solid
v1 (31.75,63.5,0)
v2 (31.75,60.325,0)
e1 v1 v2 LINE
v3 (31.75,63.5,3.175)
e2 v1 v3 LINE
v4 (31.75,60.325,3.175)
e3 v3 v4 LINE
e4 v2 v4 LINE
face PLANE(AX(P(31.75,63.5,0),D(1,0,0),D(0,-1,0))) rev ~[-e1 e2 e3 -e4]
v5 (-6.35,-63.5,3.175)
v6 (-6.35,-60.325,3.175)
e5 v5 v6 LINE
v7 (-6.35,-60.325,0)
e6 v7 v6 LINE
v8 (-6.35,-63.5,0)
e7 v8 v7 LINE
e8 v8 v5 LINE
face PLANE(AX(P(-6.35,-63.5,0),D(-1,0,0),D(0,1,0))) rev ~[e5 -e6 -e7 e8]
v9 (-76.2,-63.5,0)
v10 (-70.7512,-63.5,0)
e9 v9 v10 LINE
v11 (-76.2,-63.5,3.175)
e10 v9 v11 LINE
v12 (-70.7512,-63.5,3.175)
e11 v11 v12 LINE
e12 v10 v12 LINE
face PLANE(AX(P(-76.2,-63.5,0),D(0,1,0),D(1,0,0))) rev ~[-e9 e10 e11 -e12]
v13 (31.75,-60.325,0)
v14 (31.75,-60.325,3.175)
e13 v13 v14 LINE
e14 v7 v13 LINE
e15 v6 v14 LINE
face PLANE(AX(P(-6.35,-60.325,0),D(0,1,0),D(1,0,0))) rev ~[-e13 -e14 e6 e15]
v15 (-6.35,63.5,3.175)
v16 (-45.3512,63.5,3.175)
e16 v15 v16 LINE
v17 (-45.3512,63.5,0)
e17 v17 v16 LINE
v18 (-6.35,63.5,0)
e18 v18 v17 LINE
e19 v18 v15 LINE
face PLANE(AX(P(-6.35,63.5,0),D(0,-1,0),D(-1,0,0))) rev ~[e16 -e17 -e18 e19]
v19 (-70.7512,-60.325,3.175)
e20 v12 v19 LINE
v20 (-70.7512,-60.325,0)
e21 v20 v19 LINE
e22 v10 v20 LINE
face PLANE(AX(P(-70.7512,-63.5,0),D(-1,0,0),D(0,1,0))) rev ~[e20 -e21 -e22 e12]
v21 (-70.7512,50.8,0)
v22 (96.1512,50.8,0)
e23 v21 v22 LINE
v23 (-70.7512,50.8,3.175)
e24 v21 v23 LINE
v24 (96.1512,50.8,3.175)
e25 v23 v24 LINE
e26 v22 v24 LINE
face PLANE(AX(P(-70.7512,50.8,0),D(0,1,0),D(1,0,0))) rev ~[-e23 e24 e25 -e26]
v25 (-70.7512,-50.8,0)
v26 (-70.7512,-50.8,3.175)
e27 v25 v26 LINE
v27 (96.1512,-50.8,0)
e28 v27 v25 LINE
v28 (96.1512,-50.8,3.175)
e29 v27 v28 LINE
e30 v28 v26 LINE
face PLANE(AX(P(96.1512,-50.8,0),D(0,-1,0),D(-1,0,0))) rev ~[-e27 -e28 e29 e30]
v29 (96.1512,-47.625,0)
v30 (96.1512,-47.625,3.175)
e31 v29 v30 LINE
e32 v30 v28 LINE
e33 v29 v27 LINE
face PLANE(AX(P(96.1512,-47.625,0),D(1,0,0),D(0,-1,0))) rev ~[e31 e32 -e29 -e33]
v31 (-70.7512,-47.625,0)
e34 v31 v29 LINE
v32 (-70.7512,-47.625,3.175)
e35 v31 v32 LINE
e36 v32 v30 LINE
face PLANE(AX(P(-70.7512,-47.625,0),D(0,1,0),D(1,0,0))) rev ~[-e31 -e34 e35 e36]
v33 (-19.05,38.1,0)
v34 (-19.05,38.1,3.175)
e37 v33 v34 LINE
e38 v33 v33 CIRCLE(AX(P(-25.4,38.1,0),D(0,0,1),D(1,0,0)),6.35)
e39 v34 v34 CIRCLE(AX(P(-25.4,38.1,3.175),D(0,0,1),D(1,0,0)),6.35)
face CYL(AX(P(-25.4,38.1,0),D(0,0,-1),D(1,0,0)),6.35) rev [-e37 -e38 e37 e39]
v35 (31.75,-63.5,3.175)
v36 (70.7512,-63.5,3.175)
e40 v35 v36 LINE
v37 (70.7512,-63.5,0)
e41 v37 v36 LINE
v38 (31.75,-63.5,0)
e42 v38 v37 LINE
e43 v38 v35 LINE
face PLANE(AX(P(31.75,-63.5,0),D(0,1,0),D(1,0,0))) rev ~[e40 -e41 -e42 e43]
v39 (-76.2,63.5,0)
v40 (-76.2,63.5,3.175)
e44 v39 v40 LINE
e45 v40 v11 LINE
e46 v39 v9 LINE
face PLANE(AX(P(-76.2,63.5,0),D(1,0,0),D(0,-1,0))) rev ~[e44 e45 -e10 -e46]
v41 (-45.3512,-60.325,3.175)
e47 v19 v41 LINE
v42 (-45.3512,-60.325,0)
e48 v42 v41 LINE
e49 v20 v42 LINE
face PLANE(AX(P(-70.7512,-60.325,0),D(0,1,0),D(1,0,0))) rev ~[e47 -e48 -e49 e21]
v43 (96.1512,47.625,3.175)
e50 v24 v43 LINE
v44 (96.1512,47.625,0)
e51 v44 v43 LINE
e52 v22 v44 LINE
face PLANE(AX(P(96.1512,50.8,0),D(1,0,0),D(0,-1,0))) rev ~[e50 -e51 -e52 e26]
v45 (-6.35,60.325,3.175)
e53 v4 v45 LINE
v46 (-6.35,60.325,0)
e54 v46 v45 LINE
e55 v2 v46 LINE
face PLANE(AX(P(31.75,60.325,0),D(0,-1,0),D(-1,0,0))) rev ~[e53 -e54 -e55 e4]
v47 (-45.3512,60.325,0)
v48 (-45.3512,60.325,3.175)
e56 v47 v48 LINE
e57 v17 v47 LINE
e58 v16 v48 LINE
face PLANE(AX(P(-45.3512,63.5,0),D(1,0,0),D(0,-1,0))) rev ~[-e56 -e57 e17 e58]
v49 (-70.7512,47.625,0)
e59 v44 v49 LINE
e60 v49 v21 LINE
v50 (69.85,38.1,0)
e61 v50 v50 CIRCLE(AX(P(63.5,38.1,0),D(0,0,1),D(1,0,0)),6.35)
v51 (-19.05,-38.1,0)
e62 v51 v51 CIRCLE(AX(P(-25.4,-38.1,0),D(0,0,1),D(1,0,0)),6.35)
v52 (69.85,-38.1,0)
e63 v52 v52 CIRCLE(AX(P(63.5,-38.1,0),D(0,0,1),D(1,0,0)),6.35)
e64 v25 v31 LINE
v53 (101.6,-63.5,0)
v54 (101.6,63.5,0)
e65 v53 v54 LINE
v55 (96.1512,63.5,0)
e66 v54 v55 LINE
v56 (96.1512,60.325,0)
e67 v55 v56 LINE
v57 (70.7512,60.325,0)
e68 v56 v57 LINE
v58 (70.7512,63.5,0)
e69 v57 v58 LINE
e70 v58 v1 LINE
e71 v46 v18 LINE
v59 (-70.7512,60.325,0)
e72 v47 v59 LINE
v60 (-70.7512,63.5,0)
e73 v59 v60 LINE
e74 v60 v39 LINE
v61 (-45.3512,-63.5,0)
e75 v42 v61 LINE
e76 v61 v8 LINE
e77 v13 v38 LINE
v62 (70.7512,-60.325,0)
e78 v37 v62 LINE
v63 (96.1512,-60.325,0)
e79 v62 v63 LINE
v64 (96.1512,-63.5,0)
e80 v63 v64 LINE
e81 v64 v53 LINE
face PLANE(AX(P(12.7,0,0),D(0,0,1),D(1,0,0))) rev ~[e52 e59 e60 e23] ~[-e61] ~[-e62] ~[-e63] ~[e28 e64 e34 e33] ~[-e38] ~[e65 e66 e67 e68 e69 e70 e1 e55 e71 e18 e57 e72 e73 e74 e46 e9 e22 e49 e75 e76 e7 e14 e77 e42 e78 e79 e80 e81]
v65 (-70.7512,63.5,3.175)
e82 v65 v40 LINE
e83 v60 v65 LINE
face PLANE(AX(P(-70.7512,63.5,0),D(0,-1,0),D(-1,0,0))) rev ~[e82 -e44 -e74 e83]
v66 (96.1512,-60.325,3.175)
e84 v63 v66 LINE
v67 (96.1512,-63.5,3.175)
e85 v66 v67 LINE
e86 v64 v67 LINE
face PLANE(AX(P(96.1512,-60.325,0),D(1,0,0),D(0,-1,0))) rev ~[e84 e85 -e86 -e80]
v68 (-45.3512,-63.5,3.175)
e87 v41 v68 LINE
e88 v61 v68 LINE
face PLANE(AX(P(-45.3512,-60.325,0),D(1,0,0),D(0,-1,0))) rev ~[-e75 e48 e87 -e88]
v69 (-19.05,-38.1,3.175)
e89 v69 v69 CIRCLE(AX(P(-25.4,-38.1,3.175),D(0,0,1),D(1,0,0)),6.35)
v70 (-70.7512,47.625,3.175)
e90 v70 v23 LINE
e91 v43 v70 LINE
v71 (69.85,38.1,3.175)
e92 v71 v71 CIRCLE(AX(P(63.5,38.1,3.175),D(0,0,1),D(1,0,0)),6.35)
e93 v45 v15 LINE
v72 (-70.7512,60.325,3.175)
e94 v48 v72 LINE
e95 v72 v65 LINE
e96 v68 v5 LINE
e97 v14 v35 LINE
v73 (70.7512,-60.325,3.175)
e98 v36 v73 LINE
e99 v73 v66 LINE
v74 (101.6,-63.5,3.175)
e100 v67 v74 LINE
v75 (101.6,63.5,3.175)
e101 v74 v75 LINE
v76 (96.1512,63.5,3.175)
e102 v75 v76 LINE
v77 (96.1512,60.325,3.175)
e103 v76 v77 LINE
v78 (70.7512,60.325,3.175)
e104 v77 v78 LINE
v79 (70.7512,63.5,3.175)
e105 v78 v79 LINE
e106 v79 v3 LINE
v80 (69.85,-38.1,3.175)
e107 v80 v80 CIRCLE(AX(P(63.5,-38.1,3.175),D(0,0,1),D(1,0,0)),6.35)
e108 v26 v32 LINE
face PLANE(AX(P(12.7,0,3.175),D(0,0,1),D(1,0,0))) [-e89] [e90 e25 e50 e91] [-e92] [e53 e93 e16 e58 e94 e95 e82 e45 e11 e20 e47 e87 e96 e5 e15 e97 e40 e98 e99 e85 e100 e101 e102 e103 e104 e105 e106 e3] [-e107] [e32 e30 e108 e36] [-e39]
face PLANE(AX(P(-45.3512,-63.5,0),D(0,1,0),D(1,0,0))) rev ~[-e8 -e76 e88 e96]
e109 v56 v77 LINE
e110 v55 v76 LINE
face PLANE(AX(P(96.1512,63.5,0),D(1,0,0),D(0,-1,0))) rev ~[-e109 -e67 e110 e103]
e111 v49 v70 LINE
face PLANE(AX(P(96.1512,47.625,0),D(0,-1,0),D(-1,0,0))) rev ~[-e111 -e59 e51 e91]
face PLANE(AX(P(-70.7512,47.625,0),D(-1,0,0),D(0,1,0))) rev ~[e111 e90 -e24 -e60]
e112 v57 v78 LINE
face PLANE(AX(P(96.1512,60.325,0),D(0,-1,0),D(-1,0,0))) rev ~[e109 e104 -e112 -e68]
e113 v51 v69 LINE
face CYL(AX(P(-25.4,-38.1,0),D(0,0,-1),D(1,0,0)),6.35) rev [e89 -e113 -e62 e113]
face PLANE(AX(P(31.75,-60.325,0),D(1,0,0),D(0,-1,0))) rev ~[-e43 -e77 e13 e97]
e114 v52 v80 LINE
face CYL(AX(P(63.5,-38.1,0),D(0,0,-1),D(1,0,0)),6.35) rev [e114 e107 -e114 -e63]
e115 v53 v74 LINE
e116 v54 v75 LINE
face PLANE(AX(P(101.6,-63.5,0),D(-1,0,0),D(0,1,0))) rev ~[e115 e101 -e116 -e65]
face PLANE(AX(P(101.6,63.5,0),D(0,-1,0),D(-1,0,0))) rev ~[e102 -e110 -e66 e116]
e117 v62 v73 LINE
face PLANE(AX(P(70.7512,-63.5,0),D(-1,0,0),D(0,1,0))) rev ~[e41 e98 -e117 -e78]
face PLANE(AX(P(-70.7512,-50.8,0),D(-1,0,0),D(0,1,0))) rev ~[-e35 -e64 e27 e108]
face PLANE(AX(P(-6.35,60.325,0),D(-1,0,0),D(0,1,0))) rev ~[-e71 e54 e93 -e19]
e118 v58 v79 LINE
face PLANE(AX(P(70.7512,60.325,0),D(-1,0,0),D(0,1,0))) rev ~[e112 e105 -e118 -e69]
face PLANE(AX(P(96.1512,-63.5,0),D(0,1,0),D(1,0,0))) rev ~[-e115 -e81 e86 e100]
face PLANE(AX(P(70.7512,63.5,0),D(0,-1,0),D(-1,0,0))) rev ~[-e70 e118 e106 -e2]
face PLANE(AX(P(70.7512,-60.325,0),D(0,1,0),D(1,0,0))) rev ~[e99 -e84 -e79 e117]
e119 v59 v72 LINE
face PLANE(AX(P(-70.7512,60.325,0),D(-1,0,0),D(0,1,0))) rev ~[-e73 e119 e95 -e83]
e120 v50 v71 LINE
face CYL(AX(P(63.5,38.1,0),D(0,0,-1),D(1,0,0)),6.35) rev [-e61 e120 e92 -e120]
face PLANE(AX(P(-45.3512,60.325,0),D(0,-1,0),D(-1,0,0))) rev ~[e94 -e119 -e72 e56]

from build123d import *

# Parameters (mm, degrees)
F0_R     = 6.35
F1_DEPTH = 3.175


# Not quite as in the source:
# - a feature names something its author has since deleted; it is built from what else it names


with BuildPart() as f1:
    # F0 (on Top) → F1 (new body)
    with BuildSketch(Plane.XY):
        Polygon((-70.7512, 63.5), (-76.2, 63.5), (-76.2, -63.5), (-70.7512, -63.5), (-70.7512, -60.325), (-45.3512, -60.325), (-45.3512, -63.5), (-6.35, -63.5), (-6.35, -60.325), (31.75, -60.325), (31.75, -63.5), (70.7512, -63.5), (70.7512, -60.325), (96.1512, -60.325), (96.1512, -63.5), (101.6, -63.5), (101.6, 63.5), (96.1512, 63.5), (96.1512, 60.325), (70.7512, 60.325), (70.7512, 63.5), (31.75, 63.5), (31.75, 60.325), (-6.35, 60.325), (-6.35, 63.5), (-45.3512, 63.5), (-45.3512, 60.325), (-70.7512, 60.325), align=None)
        with Locations((-25.4, -38.1)):
            Circle(F0_R, mode=Mode.SUBTRACT)
        Polygon((-70.7512, -50.8), (-70.7512, -47.625), (-45.3512, -47.625), (-6.35, -47.625), (31.75, -47.625), (70.7512, -47.625), (96.1512, -47.625), (96.1512, -50.8), (70.7512, -50.8), (31.75, -50.8), (-6.35, -50.8), (-45.3512, -50.8), align=None, mode=Mode.SUBTRACT)
        with Locations((63.5, -38.1)):
            Circle(F0_R, mode=Mode.SUBTRACT)
        with Locations((-25.4, 38.1)):
            Circle(F0_R, mode=Mode.SUBTRACT)
        Polygon((96.1512, 50.8), (96.1512, 47.625), (70.7512, 47.625), (31.75, 47.625), (-6.35, 47.625), (-45.3512, 47.625), (-70.7512, 47.625), (-70.7512, 50.8), (-45.3512, 50.8), (-6.35, 50.8), (31.75, 50.8), (70.7512, 50.8), align=None, mode=Mode.SUBTRACT)
        with Locations((63.5, 38.1)):
            Circle(F0_R, mode=Mode.SUBTRACT)
    extrude(amount=F1_DEPTH)


solid = f1.part
